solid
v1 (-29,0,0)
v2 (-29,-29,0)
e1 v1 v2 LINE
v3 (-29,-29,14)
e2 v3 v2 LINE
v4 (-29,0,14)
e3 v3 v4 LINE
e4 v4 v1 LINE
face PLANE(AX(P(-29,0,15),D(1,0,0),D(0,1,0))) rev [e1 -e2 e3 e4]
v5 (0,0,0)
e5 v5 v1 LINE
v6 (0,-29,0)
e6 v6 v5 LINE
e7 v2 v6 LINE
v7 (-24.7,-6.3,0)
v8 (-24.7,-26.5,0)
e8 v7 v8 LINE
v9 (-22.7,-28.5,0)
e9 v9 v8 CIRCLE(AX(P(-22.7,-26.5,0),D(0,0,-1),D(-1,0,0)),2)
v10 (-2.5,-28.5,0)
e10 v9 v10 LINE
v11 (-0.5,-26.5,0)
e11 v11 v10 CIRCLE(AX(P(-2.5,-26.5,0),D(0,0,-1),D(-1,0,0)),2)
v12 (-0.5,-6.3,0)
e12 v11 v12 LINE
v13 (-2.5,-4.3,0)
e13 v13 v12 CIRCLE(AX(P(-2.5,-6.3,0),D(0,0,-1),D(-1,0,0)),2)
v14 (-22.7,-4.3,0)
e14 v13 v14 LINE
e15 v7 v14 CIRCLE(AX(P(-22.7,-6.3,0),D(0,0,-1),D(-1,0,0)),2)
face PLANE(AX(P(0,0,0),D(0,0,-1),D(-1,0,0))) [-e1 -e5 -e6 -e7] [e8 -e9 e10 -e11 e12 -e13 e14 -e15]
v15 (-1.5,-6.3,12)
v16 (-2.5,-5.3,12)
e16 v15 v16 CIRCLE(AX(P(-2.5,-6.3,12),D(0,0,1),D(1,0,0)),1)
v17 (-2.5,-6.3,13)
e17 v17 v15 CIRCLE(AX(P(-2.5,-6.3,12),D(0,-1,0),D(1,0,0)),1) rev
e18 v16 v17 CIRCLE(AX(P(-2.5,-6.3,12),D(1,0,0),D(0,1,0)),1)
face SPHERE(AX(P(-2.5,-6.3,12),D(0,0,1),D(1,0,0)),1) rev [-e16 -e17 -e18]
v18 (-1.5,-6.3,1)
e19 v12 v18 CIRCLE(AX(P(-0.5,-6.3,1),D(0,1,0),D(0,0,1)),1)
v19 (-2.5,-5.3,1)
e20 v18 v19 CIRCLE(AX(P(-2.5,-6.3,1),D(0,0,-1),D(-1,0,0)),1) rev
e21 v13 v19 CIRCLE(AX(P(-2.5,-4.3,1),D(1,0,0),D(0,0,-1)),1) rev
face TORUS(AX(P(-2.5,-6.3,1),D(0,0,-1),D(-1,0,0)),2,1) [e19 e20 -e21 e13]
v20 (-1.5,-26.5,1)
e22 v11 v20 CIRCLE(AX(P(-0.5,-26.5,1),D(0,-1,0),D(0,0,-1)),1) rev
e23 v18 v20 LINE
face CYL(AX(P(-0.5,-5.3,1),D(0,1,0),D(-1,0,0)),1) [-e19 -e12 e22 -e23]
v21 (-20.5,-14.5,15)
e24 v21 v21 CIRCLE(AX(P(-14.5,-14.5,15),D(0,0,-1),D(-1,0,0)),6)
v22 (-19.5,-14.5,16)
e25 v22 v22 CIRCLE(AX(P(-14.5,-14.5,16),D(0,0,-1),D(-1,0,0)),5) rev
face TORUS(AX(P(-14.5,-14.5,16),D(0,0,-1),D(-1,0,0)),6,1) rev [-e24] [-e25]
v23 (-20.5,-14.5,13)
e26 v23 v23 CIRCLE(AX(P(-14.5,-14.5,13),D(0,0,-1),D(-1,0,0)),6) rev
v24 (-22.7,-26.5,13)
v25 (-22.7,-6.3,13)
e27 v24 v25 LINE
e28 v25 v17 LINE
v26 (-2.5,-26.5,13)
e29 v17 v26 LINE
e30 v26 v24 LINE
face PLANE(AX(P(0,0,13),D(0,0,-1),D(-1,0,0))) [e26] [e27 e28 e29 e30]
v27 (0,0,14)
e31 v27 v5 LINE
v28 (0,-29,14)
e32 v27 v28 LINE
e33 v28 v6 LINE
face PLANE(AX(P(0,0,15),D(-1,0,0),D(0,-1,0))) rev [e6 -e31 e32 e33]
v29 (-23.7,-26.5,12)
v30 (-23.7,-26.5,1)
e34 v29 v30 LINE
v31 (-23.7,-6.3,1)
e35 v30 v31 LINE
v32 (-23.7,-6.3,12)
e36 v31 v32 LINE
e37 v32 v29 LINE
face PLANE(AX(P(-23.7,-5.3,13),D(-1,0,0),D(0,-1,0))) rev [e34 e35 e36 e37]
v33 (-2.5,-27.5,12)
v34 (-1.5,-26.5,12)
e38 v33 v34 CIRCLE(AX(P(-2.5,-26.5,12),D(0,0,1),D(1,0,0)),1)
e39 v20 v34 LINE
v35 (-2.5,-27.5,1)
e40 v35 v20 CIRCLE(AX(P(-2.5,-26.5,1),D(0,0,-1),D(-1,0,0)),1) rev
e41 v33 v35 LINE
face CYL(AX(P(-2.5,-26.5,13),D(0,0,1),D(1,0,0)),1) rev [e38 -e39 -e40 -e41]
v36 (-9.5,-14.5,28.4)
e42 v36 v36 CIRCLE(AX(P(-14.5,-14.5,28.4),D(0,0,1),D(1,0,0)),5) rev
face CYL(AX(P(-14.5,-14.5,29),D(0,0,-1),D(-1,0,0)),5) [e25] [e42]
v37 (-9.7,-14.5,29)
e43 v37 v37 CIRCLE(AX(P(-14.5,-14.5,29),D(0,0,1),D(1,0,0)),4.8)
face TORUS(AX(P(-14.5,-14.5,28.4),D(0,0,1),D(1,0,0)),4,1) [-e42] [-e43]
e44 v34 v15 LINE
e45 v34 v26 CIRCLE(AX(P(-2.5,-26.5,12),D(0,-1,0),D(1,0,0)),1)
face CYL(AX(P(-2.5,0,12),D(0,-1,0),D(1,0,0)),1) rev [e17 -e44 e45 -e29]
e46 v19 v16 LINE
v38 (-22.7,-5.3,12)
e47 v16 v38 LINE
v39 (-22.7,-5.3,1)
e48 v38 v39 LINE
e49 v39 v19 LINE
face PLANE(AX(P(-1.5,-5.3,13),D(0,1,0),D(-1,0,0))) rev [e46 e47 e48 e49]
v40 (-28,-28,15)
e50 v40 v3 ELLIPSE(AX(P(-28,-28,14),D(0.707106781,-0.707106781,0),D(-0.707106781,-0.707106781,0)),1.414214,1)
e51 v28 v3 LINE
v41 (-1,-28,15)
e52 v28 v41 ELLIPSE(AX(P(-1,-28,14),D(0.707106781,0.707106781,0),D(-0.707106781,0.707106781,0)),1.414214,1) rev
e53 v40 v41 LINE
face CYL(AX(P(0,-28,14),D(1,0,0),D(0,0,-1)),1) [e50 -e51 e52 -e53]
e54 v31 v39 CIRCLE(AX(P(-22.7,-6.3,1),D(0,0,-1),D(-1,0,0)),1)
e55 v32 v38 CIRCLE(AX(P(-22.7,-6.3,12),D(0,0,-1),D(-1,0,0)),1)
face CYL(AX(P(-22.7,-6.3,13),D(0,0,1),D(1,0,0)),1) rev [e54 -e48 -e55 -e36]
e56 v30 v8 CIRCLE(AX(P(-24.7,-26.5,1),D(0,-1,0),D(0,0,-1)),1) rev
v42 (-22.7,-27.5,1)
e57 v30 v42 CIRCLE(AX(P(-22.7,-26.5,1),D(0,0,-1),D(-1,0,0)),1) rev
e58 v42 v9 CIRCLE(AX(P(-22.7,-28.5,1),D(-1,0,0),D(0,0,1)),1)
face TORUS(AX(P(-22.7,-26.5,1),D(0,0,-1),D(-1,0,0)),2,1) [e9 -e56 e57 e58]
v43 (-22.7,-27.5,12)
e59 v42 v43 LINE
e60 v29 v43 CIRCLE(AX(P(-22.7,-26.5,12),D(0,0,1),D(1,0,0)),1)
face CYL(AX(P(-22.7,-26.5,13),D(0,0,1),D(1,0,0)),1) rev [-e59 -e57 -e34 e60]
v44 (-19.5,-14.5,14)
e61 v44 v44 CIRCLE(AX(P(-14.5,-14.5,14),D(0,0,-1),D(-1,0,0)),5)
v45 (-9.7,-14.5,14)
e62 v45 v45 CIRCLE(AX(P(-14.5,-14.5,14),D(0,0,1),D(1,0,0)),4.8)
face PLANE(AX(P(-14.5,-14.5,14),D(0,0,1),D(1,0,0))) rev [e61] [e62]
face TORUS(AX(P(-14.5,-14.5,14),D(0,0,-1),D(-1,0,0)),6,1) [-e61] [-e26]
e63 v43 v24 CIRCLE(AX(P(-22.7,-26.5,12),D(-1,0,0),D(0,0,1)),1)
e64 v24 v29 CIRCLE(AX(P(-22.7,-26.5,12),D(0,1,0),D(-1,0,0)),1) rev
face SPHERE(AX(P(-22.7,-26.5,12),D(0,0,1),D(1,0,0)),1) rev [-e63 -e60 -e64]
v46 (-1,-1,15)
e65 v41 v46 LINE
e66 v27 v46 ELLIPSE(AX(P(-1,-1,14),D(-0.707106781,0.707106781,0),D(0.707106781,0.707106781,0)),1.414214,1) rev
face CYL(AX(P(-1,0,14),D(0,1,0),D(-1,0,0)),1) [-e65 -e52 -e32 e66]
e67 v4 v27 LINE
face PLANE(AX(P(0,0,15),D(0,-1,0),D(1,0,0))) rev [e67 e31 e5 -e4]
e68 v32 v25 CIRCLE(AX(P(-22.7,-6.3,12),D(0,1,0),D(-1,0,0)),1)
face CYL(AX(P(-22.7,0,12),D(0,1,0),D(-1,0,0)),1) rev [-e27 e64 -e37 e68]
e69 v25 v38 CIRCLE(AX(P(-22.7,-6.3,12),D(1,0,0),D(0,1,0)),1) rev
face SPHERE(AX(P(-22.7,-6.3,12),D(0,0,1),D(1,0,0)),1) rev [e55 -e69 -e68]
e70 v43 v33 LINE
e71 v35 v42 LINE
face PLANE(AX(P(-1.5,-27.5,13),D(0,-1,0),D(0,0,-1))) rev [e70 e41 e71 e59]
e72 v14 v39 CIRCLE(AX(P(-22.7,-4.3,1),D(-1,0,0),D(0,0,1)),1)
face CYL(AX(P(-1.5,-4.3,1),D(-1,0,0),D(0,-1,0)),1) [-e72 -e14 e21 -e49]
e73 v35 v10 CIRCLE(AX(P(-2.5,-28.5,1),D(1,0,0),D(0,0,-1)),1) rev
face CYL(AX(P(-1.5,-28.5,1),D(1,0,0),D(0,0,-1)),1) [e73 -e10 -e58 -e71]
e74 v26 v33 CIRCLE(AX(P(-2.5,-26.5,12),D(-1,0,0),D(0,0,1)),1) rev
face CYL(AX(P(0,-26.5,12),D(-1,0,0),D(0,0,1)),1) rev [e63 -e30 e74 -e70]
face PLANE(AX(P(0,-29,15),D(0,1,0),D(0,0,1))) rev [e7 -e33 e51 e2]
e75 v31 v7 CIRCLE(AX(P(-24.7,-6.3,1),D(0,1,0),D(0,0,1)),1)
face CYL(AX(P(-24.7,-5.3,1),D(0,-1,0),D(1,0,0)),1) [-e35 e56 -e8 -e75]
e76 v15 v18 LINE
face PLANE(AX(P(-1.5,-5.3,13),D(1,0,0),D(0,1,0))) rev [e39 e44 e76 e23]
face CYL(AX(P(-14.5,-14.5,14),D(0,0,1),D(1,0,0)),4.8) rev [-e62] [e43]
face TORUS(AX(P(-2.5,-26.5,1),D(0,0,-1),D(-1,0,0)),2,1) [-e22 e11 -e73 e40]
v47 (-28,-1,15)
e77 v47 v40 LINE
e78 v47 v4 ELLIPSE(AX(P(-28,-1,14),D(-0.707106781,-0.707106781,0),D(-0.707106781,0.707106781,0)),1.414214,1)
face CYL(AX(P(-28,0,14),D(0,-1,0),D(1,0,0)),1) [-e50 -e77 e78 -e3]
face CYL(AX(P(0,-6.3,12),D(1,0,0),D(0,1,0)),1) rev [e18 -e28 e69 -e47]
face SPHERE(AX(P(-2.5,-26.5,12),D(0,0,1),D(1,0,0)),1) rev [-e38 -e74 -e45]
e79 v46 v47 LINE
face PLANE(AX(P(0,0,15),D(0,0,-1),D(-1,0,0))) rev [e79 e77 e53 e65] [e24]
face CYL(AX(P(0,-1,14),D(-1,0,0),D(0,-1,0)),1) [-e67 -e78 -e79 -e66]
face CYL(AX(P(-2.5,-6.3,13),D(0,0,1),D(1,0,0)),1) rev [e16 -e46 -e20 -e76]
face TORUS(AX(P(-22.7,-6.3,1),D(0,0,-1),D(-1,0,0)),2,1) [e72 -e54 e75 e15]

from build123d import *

# Parameters (mm, degrees)
SKETCH1_W           = 29
SKETCH1_H           = 29
BOSS_EXTRUDE1_DEPTH = 15
SKETCH2_R           = 5
CUT_EXTRUDE1_DEPTH  = 44.669211122
SKETCH3_W           = 22.2
SKETCH3_H           = 22.2
CUT_EXTRUDE2_DEPTH  = 13
FILLET2_R           = 1
FILLET3_R           = 1
BOSS_EXTRUDE3_START = 15
SKETCH7_R           = 5
BOSS_EXTRUDE3_DEPTH = 15
SKETCH8_R           = 4.8
CUT_EXTRUDE4_DEPTH  = 15
FILLET4_R           = 1


with BuildPart() as part:
    # Sketch1 → Boss-Extrude1 (new body)
    with BuildSketch(Plane.XY):
        with Locations((-14.5, -14.5)):
            Rectangle(SKETCH1_W, SKETCH1_H)
    extrude(amount=BOSS_EXTRUDE1_DEPTH)

    # Sketch2 → Cut-Extrude1 (cut, through all)
    with BuildSketch(Plane.XY.offset(15)):
        with Locations((-14.5, -14.5)):
            Circle(SKETCH2_R)
    extrude(amount=-CUT_EXTRUDE1_DEPTH, mode=Mode.SUBTRACT)

    # Sketch3 → Cut-Extrude2 (cut)
    with BuildSketch(Plane(origin=(0, 0, 0), x_dir=(-1, 0, 0), z_dir=(0, 0, -1))):
        with Locations((12.6, -16.4)):
            Rectangle(SKETCH3_W, SKETCH3_H)
    extrude(amount=-CUT_EXTRUDE2_DEPTH, mode=Mode.SUBTRACT)

    # Fillet2
    fillet2_edges = [part.edges().sort_by_distance(p)[0] for p in [
        (-1.5, -16.4, 13),
        (-12.6, -5.3, 13),
        (-23.7, -16.4, 13),
        (-12.6, -27.5, 13),
        (-19.5, -14.5, 13),
    ]]
    fillet(fillet2_edges, radius=FILLET2_R)

    # Fillet3
    # the kernel refuses this fillet: 1 mm, written as the material it adds along each edge
    with BuildSketch(Plane(origin=(-22.7, -26.5, 12), x_dir=(0, -1, 0), z_dir=(-1, 0, 0))) as fillet3_piece_1_section:
        Polygon((0, 0), (FILLET3_R, 0), (FILLET3_R, FILLET3_R), (0, FILLET3_R), align=None)
    fillet3_piece_1 = extrude(amount=FILLET3_R, mode=Mode.PRIVATE)
    fillet3_piece_1 = fillet3_piece_1 - Plane(origin=(-22.7, -26.5, 12), x_dir=(0, 0.7071067811865475, -0.7071067811865475), z_dir=(-1, 0, 0)) * Sphere(FILLET3_R, mode=Mode.PRIVATE)
    add(fillet3_piece_1)
    with BuildSketch(Plane(origin=(-2.5, -26.5, 12), x_dir=(0, -1, 0), z_dir=(1, 0, 0))) as fillet3_piece_2_section:
        Polygon((0, 0), (FILLET3_R, 0), (FILLET3_R, -FILLET3_R), (0, -FILLET3_R), align=None)
    fillet3_piece_2 = extrude(amount=FILLET3_R, mode=Mode.PRIVATE)
    fillet3_piece_2 = fillet3_piece_2 - Plane(origin=(-2.5, -26.5, 12), x_dir=(0, 0.7071067811865475, -0.7071067811865475), z_dir=(1, 0, 0)) * Sphere(FILLET3_R, mode=Mode.PRIVATE)
    add(fillet3_piece_2)
    with BuildSketch(Plane(origin=(-22.7, -6.3, 12), x_dir=(-1, 0, 0), z_dir=(0, 1, 0))) as fillet3_piece_3_section:
        Polygon((0, 0), (FILLET3_R, 0), (FILLET3_R, FILLET3_R), (0, FILLET3_R), align=None)
    fillet3_piece_3 = extrude(amount=FILLET3_R, mode=Mode.PRIVATE)
    fillet3_piece_3 = fillet3_piece_3 - Plane(origin=(-22.7, -6.3, 12), x_dir=(0.7071067811865475, 0, -0.7071067811865475), z_dir=(0, 1, 0)) * Sphere(FILLET3_R, mode=Mode.PRIVATE)
    add(fillet3_piece_3)
    with BuildSketch(Plane(origin=(-2.5, -6.3, 12), x_dir=(1, 0, 0), z_dir=(0, 1, 0))) as fillet3_piece_4_section:
        Polygon((0, 0), (FILLET3_R, 0), (FILLET3_R, -FILLET3_R), (0, -FILLET3_R), align=None)
    fillet3_piece_4 = extrude(amount=FILLET3_R, mode=Mode.PRIVATE)
    fillet3_piece_4 = fillet3_piece_4 - Plane(origin=(-2.5, -6.3, 12), x_dir=(-0.7071067811865475, 0, -0.7071067811865475), z_dir=(0, 1, 0)) * Sphere(FILLET3_R, mode=Mode.PRIVATE)
    add(fillet3_piece_4)
    with BuildSketch(Plane(origin=(-1.5, -5.3, 0), x_dir=(-1, 0, 0), z_dir=(0, 0, 1)), Plane(origin=(-1.5, -27.5, 0), x_dir=(0, 1, 0), z_dir=(0, 0, 1))) as fillet3_piece_5:
        with BuildLine():
            CenterArc((FILLET3_R, FILLET3_R), FILLET3_R, 180, 90)
            Line((0, FILLET3_R), (0, 0))
            Line((0, 0), (FILLET3_R, 0))
        make_face()
    extrude(amount=12)
    with BuildSketch(Plane(origin=(-23.7, -5.3, 0), x_dir=(1, 0, 0), z_dir=(0, 0, 1)), Plane(origin=(-23.7, -27.5, 0), x_dir=(0, 1, 0), z_dir=(0, 0, 1))) as fillet3_piece_6:
        with BuildLine():
            CenterArc((FILLET3_R, -FILLET3_R), FILLET3_R, 90, 90)
            Line((0, -FILLET3_R), (0, 0))
            Line((0, 0), (FILLET3_R, 0))
        make_face()
    extrude(amount=12)
    # the kernel refuses this fillet: 1 mm, written as the material it takes off along each edge
    with BuildSketch(Plane(origin=(-1.5, -26.5, 0), x_dir=(1, 0, 0), z_dir=(0, 1, 0)), Plane(origin=(-22.7, -27.5, 0), x_dir=(0, -1, 0), z_dir=(1, 0, 0)), Plane(origin=(-23.7, -6.3, 0), x_dir=(-1, 0, 0), z_dir=(0, -1, 0)), Plane(origin=(-2.5, -5.3, 0), x_dir=(0, 1, 0), z_dir=(-1, 0, 0))) as fillet3_2_piece_1:
        with BuildLine():
            CenterArc((FILLET3_R, -FILLET3_R), FILLET3_R, 90, 90)
            Line((0, -FILLET3_R), (0, 0))
            Line((0, 0), (FILLET3_R, 0))
        make_face()
    extrude(amount=20.2, mode=Mode.SUBTRACT)
    with BuildSketch(Plane(origin=(-2.5, -6.3, 0), x_dir=(0, 1, 0), z_dir=(-1, 0, 0))) as fillet3_2_piece_2:
        with BuildLine():
            CenterArc((1 + FILLET3_R, -FILLET3_R), FILLET3_R, 90, 90)
            Line((1, -FILLET3_R), (1, 0))
            Line((1, 0), (1 + FILLET3_R, 0))
        make_face()
    revolve(axis=Axis((-2.5, -6.3, 0), (0, 0, -1)), revolution_arc=90, mode=Mode.SUBTRACT)
    with BuildSketch(Plane(origin=(-22.7, -6.3, 0), x_dir=(0, 1, 0), z_dir=(1, 0, 0))) as fillet3_2_piece_3:
        with BuildLine():
            CenterArc((1 + FILLET3_R, FILLET3_R), FILLET3_R, 180, 90)
            Line((1, FILLET3_R), (1, 0))
            Line((1, 0), (1 + FILLET3_R, 0))
        make_face()
    revolve(axis=Axis((-22.7, -6.3, 0), (0, 0, 1)), revolution_arc=90, mode=Mode.SUBTRACT)
    with BuildSketch(Plane(origin=(-22.7, -26.5, 0), x_dir=(-1, 0, 0), z_dir=(0, 1, 0))) as fillet3_2_piece_4:
        with BuildLine():
            CenterArc((1 + FILLET3_R, FILLET3_R), FILLET3_R, 180, 90)
            Line((1, FILLET3_R), (1, 0))
            Line((1, 0), (1 + FILLET3_R, 0))
        make_face()
    revolve(axis=Axis((-22.7, -26.5, 0), (0, 0, 1)), revolution_arc=90, mode=Mode.SUBTRACT)
    with BuildSketch(Plane(origin=(-2.5, -26.5, 0), x_dir=(1, 0, 0), z_dir=(0, 1, 0))) as fillet3_2_piece_5:
        with BuildLine():
            CenterArc((1 + FILLET3_R, -FILLET3_R), FILLET3_R, 90, 90)
            Line((1, -FILLET3_R), (1, 0))
            Line((1, 0), (1 + FILLET3_R, 0))
        make_face()
    revolve(axis=Axis((-2.5, -26.5, 0), (0, 0, -1)), revolution_arc=90, mode=Mode.SUBTRACT)

    # Sketch7 → Boss-Extrude3 (add)
    with BuildSketch(Plane.XY.offset(14).offset(BOSS_EXTRUDE3_START)):
        with Locations((-14.5, -14.5)):
            Circle(SKETCH7_R)
    extrude(amount=-BOSS_EXTRUDE3_DEPTH)

    # Sketch8 → Cut-Extrude4 (cut)
    with BuildSketch(Plane.XY.offset(29)):
        with Locations((-14.5, -14.5)):
            Circle(SKETCH8_R)
    extrude(amount=-CUT_EXTRUDE4_DEPTH, mode=Mode.SUBTRACT)

    # Fillet4
    # the kernel refuses this fillet: 1 mm, written as the material it adds along each edge
    with BuildSketch(Plane(origin=(-14.5, -14.5, 15), x_dir=(1, 0, 0), z_dir=(0, -1, 0))) as fillet4_piece_1:
        with BuildLine():
            CenterArc((5 + FILLET4_R, FILLET4_R), FILLET4_R, 180, 90)
            Line((5, FILLET4_R), (5, 0))
            Line((5, 0), (5 + FILLET4_R, 0))
        make_face()
    revolve(axis=Axis((-14.5, -14.5, 15), (0, 0, 1)))
    # the kernel refuses this fillet: 1 mm, written as the material it takes off along each edge
    with BuildSketch(Plane(origin=(-29, 2.5, 15), x_dir=(0, 0, -1), z_dir=(0, -1, 0)), Plane(origin=(-31.5, -29, 15), x_dir=(0, 0, -1), z_dir=(1, 0, 0)), Plane(origin=(0, -31.5, 15), x_dir=(0, 0, -1), z_dir=(0, 1, 0)), Plane(origin=(2.5, 0, 15), x_dir=(0, 0, -1), z_dir=(-1, 0, 0))) as fillet4_2_piece_1:
        with BuildLine():
            CenterArc((FILLET4_R, FILLET4_R), FILLET4_R, 180, 90)
            Line((0, FILLET4_R), (0, 0))
            Line((0, 0), (FILLET4_R, 0))
        make_face()
    extrude(amount=34, mode=Mode.SUBTRACT)
    with BuildSketch(Plane(origin=(-14.5, -14.5, 29), x_dir=(1, 0, 0), z_dir=(0, -1, 0))) as fillet4_2_piece_2:
        with BuildLine():
            CenterArc((4, -0.6), FILLET4_R, 0, 36.869897646)
            Line((4.8, 0), (5, 0))
            Line((5, 0), (5, -0.6))
        make_face()
    revolve(axis=Axis((-14.5, -14.5, 29), (0, 0, 1)), mode=Mode.SUBTRACT)


solid = part.part
